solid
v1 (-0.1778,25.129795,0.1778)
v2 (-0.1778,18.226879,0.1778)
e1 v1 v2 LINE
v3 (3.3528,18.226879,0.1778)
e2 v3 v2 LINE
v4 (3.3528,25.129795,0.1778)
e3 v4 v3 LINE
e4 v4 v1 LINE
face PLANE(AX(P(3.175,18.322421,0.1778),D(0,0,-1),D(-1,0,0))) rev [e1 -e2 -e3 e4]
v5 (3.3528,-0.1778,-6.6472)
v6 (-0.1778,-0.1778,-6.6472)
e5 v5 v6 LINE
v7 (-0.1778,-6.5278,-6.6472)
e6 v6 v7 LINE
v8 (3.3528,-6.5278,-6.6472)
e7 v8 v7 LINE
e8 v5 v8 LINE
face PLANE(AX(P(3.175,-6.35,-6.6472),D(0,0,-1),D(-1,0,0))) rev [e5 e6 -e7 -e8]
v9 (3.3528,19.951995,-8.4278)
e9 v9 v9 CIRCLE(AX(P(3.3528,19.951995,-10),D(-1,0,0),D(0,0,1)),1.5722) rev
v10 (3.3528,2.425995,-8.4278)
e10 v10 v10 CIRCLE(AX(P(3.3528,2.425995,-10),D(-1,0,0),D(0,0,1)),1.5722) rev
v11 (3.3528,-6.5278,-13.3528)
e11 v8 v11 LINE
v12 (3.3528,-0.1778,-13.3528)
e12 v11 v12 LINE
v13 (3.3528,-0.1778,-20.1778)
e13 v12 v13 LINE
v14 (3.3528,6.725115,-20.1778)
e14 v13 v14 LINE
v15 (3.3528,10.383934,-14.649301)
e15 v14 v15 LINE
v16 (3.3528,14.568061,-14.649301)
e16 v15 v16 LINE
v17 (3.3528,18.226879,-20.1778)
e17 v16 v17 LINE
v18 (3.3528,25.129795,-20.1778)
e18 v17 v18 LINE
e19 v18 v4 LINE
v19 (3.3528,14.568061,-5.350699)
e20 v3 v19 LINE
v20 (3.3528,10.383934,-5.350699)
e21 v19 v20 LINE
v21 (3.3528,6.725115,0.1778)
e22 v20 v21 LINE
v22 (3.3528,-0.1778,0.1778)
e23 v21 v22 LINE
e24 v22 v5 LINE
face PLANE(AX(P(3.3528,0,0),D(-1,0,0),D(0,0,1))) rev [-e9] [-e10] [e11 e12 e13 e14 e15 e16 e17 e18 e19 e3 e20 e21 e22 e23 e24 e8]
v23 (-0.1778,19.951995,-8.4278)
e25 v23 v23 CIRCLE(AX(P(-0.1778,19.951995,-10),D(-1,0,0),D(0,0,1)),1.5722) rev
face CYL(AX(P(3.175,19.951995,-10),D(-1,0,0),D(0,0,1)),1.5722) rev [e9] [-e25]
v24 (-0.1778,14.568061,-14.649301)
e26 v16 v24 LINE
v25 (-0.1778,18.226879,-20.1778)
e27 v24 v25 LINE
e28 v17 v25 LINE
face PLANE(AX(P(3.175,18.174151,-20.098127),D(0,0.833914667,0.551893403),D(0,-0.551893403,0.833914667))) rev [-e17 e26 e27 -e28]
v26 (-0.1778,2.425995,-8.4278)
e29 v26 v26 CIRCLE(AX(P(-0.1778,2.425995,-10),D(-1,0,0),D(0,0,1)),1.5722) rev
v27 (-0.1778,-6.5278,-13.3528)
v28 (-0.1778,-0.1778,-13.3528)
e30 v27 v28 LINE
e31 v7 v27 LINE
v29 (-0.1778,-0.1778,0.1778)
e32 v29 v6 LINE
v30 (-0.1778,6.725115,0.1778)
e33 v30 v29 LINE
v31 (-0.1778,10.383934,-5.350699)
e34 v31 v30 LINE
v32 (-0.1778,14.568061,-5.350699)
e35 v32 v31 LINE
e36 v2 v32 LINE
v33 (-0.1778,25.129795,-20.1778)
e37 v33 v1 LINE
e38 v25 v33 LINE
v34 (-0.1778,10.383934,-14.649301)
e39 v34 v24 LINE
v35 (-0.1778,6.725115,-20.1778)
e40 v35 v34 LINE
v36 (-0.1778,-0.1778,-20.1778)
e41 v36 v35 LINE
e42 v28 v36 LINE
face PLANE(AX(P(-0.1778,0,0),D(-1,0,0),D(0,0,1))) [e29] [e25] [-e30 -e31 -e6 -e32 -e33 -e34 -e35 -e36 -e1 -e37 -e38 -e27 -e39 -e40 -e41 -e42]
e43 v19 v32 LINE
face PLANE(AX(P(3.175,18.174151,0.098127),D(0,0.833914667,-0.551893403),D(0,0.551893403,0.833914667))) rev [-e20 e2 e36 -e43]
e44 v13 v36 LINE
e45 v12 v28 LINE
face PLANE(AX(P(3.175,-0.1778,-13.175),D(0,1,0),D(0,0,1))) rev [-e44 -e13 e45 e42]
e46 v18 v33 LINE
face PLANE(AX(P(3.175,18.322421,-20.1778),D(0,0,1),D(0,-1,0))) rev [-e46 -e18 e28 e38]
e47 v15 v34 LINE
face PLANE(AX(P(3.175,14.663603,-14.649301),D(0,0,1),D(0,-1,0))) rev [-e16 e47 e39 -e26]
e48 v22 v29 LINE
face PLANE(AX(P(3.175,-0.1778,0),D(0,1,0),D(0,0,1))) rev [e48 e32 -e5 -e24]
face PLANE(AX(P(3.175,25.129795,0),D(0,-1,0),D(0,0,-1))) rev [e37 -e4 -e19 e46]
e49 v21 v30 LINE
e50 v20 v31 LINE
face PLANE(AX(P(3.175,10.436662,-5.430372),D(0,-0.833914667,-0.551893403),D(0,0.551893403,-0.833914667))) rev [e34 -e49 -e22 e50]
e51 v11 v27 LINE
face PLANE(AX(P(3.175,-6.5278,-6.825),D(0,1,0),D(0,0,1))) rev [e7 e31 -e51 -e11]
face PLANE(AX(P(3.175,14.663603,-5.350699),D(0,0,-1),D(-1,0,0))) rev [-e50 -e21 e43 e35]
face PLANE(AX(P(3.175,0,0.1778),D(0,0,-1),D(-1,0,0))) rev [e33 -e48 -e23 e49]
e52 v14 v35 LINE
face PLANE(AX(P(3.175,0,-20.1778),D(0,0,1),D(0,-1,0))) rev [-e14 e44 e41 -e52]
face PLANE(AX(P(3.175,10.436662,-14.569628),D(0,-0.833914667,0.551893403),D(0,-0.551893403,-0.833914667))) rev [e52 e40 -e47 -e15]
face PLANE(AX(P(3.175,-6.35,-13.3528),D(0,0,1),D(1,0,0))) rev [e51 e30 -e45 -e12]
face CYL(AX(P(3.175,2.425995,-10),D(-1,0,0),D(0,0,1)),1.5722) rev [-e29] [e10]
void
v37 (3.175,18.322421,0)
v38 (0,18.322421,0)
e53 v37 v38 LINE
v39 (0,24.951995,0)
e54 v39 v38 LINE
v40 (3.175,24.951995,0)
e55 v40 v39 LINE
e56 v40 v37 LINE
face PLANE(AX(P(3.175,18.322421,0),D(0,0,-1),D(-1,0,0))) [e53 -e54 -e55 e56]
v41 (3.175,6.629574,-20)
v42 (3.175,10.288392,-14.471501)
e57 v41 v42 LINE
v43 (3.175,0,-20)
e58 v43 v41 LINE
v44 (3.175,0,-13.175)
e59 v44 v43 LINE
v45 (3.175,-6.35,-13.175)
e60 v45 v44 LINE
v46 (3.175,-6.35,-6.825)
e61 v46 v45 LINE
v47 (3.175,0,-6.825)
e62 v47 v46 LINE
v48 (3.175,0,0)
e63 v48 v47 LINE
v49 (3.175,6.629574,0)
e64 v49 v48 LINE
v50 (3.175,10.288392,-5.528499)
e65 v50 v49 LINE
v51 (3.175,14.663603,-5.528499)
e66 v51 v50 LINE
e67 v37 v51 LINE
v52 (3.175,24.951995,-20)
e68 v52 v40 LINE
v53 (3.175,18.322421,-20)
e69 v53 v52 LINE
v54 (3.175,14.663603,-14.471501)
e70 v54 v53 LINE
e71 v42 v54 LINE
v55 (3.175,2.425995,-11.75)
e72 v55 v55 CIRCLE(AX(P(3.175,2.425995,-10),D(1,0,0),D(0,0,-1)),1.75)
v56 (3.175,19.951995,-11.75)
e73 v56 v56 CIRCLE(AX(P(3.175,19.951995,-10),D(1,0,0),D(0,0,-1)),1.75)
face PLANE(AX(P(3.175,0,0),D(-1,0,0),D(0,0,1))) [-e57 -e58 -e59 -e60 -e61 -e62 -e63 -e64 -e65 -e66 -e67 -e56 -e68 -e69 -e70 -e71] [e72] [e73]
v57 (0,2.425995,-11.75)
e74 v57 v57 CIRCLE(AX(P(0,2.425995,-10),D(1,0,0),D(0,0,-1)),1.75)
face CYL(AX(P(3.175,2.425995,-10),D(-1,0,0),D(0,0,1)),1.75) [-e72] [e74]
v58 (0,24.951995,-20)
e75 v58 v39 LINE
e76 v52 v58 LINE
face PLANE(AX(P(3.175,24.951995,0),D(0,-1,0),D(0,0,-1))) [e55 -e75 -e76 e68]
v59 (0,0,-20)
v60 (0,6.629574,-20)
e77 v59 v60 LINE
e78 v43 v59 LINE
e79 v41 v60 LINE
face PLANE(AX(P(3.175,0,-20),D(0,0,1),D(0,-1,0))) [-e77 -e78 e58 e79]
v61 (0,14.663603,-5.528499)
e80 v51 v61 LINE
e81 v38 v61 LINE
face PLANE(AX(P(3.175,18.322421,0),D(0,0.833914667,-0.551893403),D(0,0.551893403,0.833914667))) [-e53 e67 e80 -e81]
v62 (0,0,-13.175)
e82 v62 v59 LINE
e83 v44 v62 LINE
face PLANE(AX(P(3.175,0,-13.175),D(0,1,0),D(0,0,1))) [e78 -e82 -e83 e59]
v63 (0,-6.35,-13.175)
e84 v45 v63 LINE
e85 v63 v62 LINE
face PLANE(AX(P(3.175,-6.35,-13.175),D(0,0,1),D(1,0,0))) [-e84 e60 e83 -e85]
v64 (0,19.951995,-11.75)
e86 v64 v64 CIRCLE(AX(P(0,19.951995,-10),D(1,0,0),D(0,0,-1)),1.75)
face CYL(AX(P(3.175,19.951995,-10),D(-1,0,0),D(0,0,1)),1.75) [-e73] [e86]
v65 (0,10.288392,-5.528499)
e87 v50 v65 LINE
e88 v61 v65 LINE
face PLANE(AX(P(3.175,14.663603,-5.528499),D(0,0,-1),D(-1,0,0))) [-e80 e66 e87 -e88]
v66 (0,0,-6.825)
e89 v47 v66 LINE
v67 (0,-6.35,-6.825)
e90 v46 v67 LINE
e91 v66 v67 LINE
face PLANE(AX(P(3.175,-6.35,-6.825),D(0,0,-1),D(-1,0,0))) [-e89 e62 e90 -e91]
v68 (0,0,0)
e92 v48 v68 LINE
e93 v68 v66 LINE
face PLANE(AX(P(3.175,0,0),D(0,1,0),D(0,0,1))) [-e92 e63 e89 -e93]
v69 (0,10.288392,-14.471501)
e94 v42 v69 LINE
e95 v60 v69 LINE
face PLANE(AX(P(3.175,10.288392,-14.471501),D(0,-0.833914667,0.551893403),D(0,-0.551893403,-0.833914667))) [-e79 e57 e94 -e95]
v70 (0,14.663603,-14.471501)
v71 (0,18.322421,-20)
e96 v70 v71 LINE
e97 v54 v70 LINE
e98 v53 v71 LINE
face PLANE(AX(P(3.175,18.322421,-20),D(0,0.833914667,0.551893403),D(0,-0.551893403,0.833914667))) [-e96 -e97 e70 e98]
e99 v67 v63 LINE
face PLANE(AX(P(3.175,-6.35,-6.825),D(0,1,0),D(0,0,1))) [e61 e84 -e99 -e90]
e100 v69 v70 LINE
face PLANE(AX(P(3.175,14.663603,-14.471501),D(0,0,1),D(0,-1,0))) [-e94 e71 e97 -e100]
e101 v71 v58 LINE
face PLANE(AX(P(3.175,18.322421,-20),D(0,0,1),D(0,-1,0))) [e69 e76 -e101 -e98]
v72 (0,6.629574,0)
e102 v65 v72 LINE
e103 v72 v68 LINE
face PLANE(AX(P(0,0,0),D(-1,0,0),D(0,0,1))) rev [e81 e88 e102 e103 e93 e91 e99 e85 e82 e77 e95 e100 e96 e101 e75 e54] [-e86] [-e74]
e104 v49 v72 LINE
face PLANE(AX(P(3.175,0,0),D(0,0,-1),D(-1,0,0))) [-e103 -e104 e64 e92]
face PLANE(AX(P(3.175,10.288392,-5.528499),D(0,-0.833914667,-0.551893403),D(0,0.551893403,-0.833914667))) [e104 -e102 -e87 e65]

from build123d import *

# Parameters (mm, degrees)
SKETCH1_R            = 1.75
BOSS_EXTRUDE1_DEPTH  = 3.175
SHELL1_START         = -13.3528
SHELL1_OUTLINE_W     = 3.5306
SHELL1_OUTLINE_H     = 6.35
SHELL1_DEPTH         = 0.1778
SHELL1_START_2       = -6.825
SHELL1_2_OUTLINE_W   = 3.5306
SHELL1_2_OUTLINE_H   = 6.35
SHELL1_2_DEPTH       = 0.1778
SHELL1_START_3       = -20.1778
SHELL1_3_OUTLINE_W   = 3.5306
SHELL1_3_OUTLINE_H   = 25.3075948
SHELL1_3_DEPTH       = 20.3556
SHELL1_START_4       = -13.175
SHELL1_4_OUTLINE_W   = 3.5306
SHELL1_4_OUTLINE_H   = 6.35
SHELL1_4_DEPTH       = 6.35
SHELL1_5_OUTLINE_R   = 1.75
SHELL1_5_OUTLINE_R_2 = 1.5722
SHELL1_5_DEPTH       = 3.175
SHELL1_START_5       = -0.1778
SHELL1_6_OUTLINE_R   = 1.5722
SHELL1_6_DEPTH       = 3.5306


with BuildPart() as part:
    # Sketch1 → Boss-Extrude1 (new body)
    with BuildSketch(Plane(origin=(0, 0, 0), x_dir=(0, 0, -1), z_dir=(1, 0, 0))):
        Polygon((0, 0), (6.825, 0), (6.825, -6.35), (13.175, -6.35), (13.175, 0), (20, 0), (20, 6.629574014), (14.471500996, 10.288392178), (14.471500996, 14.663602622), (20, 18.322420786), (20, 24.9519948), (0, 24.9519948), (0, 18.322420786), (5.528499004, 14.663602622), (5.528499004, 10.288392178), (0, 6.629574014), align=None)
        with Locations((10, 19.9519948)):
            Circle(SKETCH1_R, mode=Mode.SUBTRACT)
        with Locations((10, 2.4259948)):
            Circle(SKETCH1_R, mode=Mode.SUBTRACT)
    extrude(amount=BOSS_EXTRUDE1_DEPTH)

    # Shell1: read off the stored shape, not the designer's step
    # Shell1 outline → Shell1 (add)
    with BuildSketch(Plane.XY.offset(SHELL1_START)):
        with Locations((1.5875, -3.3528)):
            Rectangle(SHELL1_OUTLINE_W, SHELL1_OUTLINE_H)
    extrude(amount=SHELL1_DEPTH)

    # Shell1 2 outline → Shell1 2 (add)
    with BuildSketch(Plane.XY.offset(SHELL1_START_2)):
        with Locations((1.5875, -3.3528)):
            Rectangle(SHELL1_2_OUTLINE_W, SHELL1_2_OUTLINE_H)
    extrude(amount=SHELL1_2_DEPTH)

    # Shell1 3 outline → Shell1 3 (add)
    with BuildSketch(Plane.XY.offset(SHELL1_START_3)):
        with Locations((1.5875, 12.4759974)):
            Rectangle(SHELL1_3_OUTLINE_W, SHELL1_3_OUTLINE_H)
    extrude(amount=SHELL1_3_DEPTH)

    # Shell1 4 outline → Shell1 4 (add)
    with BuildSketch(Plane.XY.offset(SHELL1_START_4)):
        with Locations((1.5875, -3.3528)):
            Rectangle(SHELL1_4_OUTLINE_W, SHELL1_4_OUTLINE_H)
    extrude(amount=SHELL1_4_DEPTH)

    # Shell1 5 outline → Shell1 5 (cut)
    # profile 1 of 5: a face of its own
    with BuildSketch(Plane.YZ):
        Polygon((14.568061248, -14.649300996), (10.383933552, -14.649300996), (6.725115387, -20.1778), (18.226879413, -20.1778), align=None)
    # profile 2 of 5: a face of its own
    with BuildSketch(Plane.YZ):
        Polygon((10.383933552, -5.350699004), (14.568061248, -5.350699004), (18.226879413, 0.1778), (6.725115387, 0.1778), align=None)
    # profile 3 of 5: a face of its own
    with BuildSketch(Plane.YZ):
        Polygon((6.629574014, 0), (0, 0), (0, -6.825), (-6.35, -6.825), (-6.35, -13.175), (0, -13.175), (0, -20), (6.629574014, -20), (10.288392178, -14.471500996), (14.663602622, -14.471500996), (18.322420786, -20), (24.9519948, -20), (24.9519948, 0), (18.322420786, 0), (14.663602622, -5.528499004), (10.288392178, -5.528499004), align=None)
        with Locations((2.4259948, -10)):
            Circle(SHELL1_5_OUTLINE_R, mode=Mode.SUBTRACT)
        with Locations((19.9519948, -10)):
            Circle(SHELL1_5_OUTLINE_R, mode=Mode.SUBTRACT)
    # profile 4 of 5: a face of its own
    with BuildSketch(Plane.YZ):
        with Locations((2.4259948, -10)):
            Circle(SHELL1_5_OUTLINE_R_2)
    # profile 5 of 5: a face of its own
    with BuildSketch(Plane.YZ):
        with Locations((19.9519948, -10)):
            Circle(SHELL1_5_OUTLINE_R_2)
    extrude(amount=SHELL1_5_DEPTH, mode=Mode.SUBTRACT)

    # Shell1 6 outline → Shell1 6 (cut)
    with BuildSketch(Plane.YZ.offset(SHELL1_START_5)):
        Polygon((14.568061248, -14.649300996), (10.383933552, -14.649300996), (6.725115387, -20.1778), (18.226879413, -20.1778), align=None)
        Polygon((10.383933552, -5.350699004), (14.568061248, -5.350699004), (18.226879413, 0.1778), (6.725115387, 0.1778), align=None)
        with Locations((19.9519948, -10)):
            Circle(SHELL1_6_OUTLINE_R)
        with Locations((2.4259948, -10)):
            Circle(SHELL1_6_OUTLINE_R)
    extrude(amount=SHELL1_6_DEPTH, mode=Mode.SUBTRACT)


solid = part.part
